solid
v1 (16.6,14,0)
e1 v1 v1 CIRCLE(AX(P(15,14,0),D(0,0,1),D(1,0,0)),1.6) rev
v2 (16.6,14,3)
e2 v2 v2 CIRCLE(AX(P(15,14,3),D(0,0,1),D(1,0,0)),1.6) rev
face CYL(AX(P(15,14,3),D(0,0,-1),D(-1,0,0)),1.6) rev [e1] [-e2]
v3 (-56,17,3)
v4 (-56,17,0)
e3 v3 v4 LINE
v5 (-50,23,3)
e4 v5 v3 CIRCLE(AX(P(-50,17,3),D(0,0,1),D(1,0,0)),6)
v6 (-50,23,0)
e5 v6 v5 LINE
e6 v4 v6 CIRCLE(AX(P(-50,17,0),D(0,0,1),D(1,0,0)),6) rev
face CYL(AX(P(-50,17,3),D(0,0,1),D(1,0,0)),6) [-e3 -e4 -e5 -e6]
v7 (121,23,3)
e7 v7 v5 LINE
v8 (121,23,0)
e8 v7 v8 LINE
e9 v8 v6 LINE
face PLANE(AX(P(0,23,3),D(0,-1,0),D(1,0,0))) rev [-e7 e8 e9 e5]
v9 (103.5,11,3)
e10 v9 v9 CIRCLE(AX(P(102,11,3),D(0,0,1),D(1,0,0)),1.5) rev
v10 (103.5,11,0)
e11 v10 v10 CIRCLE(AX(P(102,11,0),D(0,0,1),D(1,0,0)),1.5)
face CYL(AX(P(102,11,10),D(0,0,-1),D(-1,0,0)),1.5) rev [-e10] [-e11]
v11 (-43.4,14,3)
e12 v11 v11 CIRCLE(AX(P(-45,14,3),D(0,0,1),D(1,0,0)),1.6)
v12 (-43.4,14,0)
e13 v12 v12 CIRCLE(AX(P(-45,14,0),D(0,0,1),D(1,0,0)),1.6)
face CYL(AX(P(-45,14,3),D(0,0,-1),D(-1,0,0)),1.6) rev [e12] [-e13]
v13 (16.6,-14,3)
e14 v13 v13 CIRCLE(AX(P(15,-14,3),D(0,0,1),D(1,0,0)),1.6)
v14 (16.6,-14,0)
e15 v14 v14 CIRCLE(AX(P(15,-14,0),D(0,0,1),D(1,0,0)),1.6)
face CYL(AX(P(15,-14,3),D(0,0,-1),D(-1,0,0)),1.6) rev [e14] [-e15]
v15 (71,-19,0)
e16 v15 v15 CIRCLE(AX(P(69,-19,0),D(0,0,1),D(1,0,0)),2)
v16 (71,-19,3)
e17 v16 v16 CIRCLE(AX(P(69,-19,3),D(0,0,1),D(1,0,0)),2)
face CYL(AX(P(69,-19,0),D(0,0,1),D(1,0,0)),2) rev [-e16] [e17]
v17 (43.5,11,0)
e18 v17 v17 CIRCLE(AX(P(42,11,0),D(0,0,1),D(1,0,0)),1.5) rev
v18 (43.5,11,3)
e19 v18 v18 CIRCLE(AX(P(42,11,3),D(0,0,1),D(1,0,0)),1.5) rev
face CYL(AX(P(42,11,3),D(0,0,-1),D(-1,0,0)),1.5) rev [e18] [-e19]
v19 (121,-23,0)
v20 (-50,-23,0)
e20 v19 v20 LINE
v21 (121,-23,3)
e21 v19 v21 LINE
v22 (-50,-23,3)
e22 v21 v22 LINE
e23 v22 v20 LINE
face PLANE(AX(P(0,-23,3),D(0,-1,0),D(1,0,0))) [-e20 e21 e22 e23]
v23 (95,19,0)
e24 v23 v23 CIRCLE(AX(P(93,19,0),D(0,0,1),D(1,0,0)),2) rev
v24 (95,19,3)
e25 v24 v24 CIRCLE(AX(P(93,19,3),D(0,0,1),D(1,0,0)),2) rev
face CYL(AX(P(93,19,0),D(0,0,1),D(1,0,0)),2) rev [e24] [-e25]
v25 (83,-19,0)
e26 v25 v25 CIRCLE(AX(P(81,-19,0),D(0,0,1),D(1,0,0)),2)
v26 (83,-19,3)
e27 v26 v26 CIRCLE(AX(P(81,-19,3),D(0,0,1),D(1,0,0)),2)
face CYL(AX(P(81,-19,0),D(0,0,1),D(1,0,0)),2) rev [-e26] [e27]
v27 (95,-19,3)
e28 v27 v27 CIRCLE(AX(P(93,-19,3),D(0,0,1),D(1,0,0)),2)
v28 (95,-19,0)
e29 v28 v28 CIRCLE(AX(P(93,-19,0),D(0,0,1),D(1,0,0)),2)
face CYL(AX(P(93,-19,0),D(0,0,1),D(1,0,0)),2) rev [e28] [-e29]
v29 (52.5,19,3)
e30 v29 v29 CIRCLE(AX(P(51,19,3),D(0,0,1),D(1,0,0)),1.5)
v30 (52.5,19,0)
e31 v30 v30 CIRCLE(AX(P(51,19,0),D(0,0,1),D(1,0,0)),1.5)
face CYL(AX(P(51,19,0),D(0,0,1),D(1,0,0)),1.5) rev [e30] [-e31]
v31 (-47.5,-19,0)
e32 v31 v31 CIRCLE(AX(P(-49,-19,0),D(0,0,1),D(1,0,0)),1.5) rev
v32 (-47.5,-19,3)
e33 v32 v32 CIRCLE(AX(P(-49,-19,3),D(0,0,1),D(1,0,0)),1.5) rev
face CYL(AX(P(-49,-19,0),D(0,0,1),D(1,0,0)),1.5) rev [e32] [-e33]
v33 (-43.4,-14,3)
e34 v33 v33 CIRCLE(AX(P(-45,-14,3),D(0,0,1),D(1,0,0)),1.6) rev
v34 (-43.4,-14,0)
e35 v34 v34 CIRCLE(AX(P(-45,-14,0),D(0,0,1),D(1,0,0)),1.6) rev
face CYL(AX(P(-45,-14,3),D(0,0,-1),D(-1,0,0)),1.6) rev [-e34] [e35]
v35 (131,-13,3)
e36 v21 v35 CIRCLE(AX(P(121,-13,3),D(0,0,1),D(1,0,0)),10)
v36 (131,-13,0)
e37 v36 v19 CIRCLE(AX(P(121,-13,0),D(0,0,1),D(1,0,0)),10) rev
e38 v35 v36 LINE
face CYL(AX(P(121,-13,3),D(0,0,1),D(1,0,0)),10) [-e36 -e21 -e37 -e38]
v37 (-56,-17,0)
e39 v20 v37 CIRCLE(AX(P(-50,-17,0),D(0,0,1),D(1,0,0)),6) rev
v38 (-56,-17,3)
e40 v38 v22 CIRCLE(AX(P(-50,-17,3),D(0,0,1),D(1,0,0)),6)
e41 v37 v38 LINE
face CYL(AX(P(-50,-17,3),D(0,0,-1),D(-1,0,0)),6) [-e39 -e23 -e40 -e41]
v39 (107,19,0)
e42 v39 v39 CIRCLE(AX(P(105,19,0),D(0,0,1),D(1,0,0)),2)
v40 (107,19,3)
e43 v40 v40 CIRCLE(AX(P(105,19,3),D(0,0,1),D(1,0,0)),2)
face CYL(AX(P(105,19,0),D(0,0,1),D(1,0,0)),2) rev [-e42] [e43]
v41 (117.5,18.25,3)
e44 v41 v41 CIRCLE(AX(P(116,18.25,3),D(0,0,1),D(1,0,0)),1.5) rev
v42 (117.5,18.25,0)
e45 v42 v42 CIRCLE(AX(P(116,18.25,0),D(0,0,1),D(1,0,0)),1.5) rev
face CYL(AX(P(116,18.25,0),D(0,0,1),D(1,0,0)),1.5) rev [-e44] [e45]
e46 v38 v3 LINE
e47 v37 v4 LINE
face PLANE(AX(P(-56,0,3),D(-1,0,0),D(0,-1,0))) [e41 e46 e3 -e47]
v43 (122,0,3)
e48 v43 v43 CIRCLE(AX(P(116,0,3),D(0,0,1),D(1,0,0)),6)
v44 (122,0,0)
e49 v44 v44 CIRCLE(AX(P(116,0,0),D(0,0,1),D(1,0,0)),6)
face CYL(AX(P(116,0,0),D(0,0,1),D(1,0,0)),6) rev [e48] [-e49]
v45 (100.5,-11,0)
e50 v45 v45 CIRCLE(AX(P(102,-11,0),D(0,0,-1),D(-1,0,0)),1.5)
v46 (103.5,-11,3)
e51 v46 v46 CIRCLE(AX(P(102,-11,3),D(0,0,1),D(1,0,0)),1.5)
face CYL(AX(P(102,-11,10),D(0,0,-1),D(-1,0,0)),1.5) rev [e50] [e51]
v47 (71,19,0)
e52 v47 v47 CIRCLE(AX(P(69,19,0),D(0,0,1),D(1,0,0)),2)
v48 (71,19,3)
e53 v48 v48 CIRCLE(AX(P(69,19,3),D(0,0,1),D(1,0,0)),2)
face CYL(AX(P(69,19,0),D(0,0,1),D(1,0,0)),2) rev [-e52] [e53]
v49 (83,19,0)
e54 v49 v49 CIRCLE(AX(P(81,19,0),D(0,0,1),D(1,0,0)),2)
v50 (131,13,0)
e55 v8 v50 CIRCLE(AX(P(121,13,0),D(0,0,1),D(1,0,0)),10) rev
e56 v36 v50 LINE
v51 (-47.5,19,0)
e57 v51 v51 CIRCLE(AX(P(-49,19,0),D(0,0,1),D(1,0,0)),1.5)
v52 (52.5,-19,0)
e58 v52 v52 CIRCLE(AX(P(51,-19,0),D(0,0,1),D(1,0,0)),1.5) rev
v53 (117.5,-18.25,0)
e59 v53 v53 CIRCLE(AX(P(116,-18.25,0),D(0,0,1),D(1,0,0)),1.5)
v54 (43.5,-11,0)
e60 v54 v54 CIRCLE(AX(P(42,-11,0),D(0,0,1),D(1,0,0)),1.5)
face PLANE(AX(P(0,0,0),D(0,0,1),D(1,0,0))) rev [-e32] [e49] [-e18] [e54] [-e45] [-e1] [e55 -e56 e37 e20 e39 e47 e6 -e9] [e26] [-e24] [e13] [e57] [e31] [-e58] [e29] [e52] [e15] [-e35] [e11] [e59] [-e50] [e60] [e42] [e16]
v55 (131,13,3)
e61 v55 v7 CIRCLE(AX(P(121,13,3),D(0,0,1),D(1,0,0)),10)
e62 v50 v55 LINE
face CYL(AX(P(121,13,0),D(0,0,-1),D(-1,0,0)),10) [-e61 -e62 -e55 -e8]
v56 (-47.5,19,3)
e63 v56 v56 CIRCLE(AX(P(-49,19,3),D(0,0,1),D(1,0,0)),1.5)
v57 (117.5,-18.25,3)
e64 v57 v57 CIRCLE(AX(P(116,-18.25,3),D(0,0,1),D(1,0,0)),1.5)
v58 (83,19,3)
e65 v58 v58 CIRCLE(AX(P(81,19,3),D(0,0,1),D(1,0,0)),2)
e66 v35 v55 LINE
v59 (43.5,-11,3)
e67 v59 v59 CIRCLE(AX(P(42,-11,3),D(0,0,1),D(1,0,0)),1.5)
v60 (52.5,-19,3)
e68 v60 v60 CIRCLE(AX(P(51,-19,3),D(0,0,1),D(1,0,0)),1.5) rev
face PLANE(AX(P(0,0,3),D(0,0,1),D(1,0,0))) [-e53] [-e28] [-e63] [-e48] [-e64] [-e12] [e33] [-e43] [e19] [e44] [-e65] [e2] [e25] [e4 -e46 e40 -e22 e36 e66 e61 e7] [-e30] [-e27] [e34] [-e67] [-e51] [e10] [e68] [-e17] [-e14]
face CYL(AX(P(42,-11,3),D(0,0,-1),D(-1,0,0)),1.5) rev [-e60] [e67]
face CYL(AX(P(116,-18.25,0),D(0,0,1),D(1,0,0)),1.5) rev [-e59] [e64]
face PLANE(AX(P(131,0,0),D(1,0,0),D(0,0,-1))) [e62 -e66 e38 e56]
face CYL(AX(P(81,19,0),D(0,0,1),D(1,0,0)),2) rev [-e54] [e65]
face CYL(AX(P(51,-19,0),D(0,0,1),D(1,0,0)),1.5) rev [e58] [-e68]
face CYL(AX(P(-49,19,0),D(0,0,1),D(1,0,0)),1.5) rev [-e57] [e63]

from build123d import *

# Parameters (mm, degrees)
BOSS_EXTRUDE1_OUTLINE_W   = 142
BOSS_EXTRUDE1_OUTLINE_H   = 46
BOSS_EXTRUDE1_OUTLINE_R   = 1.6
BOSS_EXTRUDE1_OUTLINE_R_2 = 1.5
BOSS_EXTRUDE1_DEPTH       = 3
FILLET4_R                 = 6
SKETCH3_R                 = 2
SKETCH3_R_2               = 1.5
BOSS_EXTRUDE2_DEPTH       = 3
SKETCH3_7_R               = 1.5
SKETCH3_7_R_2             = 2
CUT_EXTRUDE1_DEPTH        = 3
FILLET5_R                 = 10
SKETCH2_3_R               = 1.5
CUT_EXTRUDE2_DEPTH        = 10


# Read off the part's stored shape, not the designer's step: Boss-Extrude1
with BuildPart() as part:
    # Boss-Extrude1 outline → Boss-Extrude1 (new body)
    with BuildSketch(Plane.XY):
        with Locations((15, 0)):
            Rectangle(BOSS_EXTRUDE1_OUTLINE_W, BOSS_EXTRUDE1_OUTLINE_H)
        with Locations((-45, -14)):
            Circle(BOSS_EXTRUDE1_OUTLINE_R, mode=Mode.SUBTRACT)
        with Locations((15, -14)):
            Circle(BOSS_EXTRUDE1_OUTLINE_R, mode=Mode.SUBTRACT)
        with Locations((42, -11)):
            Circle(BOSS_EXTRUDE1_OUTLINE_R_2, mode=Mode.SUBTRACT)
        with Locations((-45, 14)):
            Circle(BOSS_EXTRUDE1_OUTLINE_R, mode=Mode.SUBTRACT)
        with Locations((42, 11)):
            Circle(BOSS_EXTRUDE1_OUTLINE_R_2, mode=Mode.SUBTRACT)
        with Locations((15, 14)):
            Circle(BOSS_EXTRUDE1_OUTLINE_R, mode=Mode.SUBTRACT)
    extrude(amount=BOSS_EXTRUDE1_DEPTH)

    # Fillet4
    fillet4_edges = [part.edges().sort_by_distance(p)[0] for p in [
        (-56, -23, 1.5),
        (-56, 23, 1.5),
    ]]
    fillet(fillet4_edges, radius=FILLET4_R)

    # Sketch3 → Boss-Extrude2 (add)
    with BuildSketch(Plane.XY.offset(3)):
        Polygon((131, -23), (131, 23), (86, 23), (86, -19), (86, -23), align=None)
        with Locations((93, -19)):
            Circle(SKETCH3_R, mode=Mode.SUBTRACT)
        with Locations((116, -18.25)):
            Circle(SKETCH3_R_2, mode=Mode.SUBTRACT)
        with BuildLine():
            ThreePointArc((110, 0), (120.242640687, 4.242640687), (116, -6))
            ThreePointArc((116, -6), (111.757359313, -4.242640687), (110, 0))
        make_face(mode=Mode.SUBTRACT)
        with Locations((105, 19)):
            Circle(SKETCH3_R, mode=Mode.SUBTRACT)
        with Locations((116, 18.25)):
            Circle(SKETCH3_R_2, mode=Mode.SUBTRACT)
        with Locations((93, 19)):
            Circle(SKETCH3_R, mode=Mode.SUBTRACT)
    extrude(amount=-BOSS_EXTRUDE2_DEPTH)

    # Sketch3<7> → Cut-Extrude1 (cut)
    with BuildSketch(Plane.XY.offset(3)):
        with Locations((51, 19)):
            Circle(SKETCH3_7_R)
        with Locations((-49, 19)):
            Circle(SKETCH3_7_R)
        with Locations((69, -19)):
            Circle(SKETCH3_7_R_2)
        with Locations((81, -19)):
            Circle(SKETCH3_7_R_2)
        with Locations((69, 19)):
            Circle(SKETCH3_7_R_2)
        with Locations((81, 19)):
            Circle(SKETCH3_7_R_2)
        with Locations((-49, -19)):
            Circle(SKETCH3_7_R)
        with Locations((51, -19)):
            Circle(SKETCH3_7_R)
    extrude(amount=-CUT_EXTRUDE1_DEPTH, mode=Mode.SUBTRACT)

    # Fillet5
    fillet5_edges = [part.edges().sort_by_distance(p)[0] for p in [
        (131, 23, 1.5),
        (131, -23, 1.5),
    ]]
    fillet(fillet5_edges, radius=FILLET5_R)

    # Sketch2<3> → Cut-Extrude2 (cut)
    with BuildSketch(Plane.XY):
        with Locations((102, 11)):
            Circle(SKETCH2_3_R)
        with Locations(Location((102, -11, 0), (0, 0, 180))):
            Circle(SKETCH2_3_R)
    extrude(amount=CUT_EXTRUDE2_DEPTH, mode=Mode.SUBTRACT)


solid = part.part
